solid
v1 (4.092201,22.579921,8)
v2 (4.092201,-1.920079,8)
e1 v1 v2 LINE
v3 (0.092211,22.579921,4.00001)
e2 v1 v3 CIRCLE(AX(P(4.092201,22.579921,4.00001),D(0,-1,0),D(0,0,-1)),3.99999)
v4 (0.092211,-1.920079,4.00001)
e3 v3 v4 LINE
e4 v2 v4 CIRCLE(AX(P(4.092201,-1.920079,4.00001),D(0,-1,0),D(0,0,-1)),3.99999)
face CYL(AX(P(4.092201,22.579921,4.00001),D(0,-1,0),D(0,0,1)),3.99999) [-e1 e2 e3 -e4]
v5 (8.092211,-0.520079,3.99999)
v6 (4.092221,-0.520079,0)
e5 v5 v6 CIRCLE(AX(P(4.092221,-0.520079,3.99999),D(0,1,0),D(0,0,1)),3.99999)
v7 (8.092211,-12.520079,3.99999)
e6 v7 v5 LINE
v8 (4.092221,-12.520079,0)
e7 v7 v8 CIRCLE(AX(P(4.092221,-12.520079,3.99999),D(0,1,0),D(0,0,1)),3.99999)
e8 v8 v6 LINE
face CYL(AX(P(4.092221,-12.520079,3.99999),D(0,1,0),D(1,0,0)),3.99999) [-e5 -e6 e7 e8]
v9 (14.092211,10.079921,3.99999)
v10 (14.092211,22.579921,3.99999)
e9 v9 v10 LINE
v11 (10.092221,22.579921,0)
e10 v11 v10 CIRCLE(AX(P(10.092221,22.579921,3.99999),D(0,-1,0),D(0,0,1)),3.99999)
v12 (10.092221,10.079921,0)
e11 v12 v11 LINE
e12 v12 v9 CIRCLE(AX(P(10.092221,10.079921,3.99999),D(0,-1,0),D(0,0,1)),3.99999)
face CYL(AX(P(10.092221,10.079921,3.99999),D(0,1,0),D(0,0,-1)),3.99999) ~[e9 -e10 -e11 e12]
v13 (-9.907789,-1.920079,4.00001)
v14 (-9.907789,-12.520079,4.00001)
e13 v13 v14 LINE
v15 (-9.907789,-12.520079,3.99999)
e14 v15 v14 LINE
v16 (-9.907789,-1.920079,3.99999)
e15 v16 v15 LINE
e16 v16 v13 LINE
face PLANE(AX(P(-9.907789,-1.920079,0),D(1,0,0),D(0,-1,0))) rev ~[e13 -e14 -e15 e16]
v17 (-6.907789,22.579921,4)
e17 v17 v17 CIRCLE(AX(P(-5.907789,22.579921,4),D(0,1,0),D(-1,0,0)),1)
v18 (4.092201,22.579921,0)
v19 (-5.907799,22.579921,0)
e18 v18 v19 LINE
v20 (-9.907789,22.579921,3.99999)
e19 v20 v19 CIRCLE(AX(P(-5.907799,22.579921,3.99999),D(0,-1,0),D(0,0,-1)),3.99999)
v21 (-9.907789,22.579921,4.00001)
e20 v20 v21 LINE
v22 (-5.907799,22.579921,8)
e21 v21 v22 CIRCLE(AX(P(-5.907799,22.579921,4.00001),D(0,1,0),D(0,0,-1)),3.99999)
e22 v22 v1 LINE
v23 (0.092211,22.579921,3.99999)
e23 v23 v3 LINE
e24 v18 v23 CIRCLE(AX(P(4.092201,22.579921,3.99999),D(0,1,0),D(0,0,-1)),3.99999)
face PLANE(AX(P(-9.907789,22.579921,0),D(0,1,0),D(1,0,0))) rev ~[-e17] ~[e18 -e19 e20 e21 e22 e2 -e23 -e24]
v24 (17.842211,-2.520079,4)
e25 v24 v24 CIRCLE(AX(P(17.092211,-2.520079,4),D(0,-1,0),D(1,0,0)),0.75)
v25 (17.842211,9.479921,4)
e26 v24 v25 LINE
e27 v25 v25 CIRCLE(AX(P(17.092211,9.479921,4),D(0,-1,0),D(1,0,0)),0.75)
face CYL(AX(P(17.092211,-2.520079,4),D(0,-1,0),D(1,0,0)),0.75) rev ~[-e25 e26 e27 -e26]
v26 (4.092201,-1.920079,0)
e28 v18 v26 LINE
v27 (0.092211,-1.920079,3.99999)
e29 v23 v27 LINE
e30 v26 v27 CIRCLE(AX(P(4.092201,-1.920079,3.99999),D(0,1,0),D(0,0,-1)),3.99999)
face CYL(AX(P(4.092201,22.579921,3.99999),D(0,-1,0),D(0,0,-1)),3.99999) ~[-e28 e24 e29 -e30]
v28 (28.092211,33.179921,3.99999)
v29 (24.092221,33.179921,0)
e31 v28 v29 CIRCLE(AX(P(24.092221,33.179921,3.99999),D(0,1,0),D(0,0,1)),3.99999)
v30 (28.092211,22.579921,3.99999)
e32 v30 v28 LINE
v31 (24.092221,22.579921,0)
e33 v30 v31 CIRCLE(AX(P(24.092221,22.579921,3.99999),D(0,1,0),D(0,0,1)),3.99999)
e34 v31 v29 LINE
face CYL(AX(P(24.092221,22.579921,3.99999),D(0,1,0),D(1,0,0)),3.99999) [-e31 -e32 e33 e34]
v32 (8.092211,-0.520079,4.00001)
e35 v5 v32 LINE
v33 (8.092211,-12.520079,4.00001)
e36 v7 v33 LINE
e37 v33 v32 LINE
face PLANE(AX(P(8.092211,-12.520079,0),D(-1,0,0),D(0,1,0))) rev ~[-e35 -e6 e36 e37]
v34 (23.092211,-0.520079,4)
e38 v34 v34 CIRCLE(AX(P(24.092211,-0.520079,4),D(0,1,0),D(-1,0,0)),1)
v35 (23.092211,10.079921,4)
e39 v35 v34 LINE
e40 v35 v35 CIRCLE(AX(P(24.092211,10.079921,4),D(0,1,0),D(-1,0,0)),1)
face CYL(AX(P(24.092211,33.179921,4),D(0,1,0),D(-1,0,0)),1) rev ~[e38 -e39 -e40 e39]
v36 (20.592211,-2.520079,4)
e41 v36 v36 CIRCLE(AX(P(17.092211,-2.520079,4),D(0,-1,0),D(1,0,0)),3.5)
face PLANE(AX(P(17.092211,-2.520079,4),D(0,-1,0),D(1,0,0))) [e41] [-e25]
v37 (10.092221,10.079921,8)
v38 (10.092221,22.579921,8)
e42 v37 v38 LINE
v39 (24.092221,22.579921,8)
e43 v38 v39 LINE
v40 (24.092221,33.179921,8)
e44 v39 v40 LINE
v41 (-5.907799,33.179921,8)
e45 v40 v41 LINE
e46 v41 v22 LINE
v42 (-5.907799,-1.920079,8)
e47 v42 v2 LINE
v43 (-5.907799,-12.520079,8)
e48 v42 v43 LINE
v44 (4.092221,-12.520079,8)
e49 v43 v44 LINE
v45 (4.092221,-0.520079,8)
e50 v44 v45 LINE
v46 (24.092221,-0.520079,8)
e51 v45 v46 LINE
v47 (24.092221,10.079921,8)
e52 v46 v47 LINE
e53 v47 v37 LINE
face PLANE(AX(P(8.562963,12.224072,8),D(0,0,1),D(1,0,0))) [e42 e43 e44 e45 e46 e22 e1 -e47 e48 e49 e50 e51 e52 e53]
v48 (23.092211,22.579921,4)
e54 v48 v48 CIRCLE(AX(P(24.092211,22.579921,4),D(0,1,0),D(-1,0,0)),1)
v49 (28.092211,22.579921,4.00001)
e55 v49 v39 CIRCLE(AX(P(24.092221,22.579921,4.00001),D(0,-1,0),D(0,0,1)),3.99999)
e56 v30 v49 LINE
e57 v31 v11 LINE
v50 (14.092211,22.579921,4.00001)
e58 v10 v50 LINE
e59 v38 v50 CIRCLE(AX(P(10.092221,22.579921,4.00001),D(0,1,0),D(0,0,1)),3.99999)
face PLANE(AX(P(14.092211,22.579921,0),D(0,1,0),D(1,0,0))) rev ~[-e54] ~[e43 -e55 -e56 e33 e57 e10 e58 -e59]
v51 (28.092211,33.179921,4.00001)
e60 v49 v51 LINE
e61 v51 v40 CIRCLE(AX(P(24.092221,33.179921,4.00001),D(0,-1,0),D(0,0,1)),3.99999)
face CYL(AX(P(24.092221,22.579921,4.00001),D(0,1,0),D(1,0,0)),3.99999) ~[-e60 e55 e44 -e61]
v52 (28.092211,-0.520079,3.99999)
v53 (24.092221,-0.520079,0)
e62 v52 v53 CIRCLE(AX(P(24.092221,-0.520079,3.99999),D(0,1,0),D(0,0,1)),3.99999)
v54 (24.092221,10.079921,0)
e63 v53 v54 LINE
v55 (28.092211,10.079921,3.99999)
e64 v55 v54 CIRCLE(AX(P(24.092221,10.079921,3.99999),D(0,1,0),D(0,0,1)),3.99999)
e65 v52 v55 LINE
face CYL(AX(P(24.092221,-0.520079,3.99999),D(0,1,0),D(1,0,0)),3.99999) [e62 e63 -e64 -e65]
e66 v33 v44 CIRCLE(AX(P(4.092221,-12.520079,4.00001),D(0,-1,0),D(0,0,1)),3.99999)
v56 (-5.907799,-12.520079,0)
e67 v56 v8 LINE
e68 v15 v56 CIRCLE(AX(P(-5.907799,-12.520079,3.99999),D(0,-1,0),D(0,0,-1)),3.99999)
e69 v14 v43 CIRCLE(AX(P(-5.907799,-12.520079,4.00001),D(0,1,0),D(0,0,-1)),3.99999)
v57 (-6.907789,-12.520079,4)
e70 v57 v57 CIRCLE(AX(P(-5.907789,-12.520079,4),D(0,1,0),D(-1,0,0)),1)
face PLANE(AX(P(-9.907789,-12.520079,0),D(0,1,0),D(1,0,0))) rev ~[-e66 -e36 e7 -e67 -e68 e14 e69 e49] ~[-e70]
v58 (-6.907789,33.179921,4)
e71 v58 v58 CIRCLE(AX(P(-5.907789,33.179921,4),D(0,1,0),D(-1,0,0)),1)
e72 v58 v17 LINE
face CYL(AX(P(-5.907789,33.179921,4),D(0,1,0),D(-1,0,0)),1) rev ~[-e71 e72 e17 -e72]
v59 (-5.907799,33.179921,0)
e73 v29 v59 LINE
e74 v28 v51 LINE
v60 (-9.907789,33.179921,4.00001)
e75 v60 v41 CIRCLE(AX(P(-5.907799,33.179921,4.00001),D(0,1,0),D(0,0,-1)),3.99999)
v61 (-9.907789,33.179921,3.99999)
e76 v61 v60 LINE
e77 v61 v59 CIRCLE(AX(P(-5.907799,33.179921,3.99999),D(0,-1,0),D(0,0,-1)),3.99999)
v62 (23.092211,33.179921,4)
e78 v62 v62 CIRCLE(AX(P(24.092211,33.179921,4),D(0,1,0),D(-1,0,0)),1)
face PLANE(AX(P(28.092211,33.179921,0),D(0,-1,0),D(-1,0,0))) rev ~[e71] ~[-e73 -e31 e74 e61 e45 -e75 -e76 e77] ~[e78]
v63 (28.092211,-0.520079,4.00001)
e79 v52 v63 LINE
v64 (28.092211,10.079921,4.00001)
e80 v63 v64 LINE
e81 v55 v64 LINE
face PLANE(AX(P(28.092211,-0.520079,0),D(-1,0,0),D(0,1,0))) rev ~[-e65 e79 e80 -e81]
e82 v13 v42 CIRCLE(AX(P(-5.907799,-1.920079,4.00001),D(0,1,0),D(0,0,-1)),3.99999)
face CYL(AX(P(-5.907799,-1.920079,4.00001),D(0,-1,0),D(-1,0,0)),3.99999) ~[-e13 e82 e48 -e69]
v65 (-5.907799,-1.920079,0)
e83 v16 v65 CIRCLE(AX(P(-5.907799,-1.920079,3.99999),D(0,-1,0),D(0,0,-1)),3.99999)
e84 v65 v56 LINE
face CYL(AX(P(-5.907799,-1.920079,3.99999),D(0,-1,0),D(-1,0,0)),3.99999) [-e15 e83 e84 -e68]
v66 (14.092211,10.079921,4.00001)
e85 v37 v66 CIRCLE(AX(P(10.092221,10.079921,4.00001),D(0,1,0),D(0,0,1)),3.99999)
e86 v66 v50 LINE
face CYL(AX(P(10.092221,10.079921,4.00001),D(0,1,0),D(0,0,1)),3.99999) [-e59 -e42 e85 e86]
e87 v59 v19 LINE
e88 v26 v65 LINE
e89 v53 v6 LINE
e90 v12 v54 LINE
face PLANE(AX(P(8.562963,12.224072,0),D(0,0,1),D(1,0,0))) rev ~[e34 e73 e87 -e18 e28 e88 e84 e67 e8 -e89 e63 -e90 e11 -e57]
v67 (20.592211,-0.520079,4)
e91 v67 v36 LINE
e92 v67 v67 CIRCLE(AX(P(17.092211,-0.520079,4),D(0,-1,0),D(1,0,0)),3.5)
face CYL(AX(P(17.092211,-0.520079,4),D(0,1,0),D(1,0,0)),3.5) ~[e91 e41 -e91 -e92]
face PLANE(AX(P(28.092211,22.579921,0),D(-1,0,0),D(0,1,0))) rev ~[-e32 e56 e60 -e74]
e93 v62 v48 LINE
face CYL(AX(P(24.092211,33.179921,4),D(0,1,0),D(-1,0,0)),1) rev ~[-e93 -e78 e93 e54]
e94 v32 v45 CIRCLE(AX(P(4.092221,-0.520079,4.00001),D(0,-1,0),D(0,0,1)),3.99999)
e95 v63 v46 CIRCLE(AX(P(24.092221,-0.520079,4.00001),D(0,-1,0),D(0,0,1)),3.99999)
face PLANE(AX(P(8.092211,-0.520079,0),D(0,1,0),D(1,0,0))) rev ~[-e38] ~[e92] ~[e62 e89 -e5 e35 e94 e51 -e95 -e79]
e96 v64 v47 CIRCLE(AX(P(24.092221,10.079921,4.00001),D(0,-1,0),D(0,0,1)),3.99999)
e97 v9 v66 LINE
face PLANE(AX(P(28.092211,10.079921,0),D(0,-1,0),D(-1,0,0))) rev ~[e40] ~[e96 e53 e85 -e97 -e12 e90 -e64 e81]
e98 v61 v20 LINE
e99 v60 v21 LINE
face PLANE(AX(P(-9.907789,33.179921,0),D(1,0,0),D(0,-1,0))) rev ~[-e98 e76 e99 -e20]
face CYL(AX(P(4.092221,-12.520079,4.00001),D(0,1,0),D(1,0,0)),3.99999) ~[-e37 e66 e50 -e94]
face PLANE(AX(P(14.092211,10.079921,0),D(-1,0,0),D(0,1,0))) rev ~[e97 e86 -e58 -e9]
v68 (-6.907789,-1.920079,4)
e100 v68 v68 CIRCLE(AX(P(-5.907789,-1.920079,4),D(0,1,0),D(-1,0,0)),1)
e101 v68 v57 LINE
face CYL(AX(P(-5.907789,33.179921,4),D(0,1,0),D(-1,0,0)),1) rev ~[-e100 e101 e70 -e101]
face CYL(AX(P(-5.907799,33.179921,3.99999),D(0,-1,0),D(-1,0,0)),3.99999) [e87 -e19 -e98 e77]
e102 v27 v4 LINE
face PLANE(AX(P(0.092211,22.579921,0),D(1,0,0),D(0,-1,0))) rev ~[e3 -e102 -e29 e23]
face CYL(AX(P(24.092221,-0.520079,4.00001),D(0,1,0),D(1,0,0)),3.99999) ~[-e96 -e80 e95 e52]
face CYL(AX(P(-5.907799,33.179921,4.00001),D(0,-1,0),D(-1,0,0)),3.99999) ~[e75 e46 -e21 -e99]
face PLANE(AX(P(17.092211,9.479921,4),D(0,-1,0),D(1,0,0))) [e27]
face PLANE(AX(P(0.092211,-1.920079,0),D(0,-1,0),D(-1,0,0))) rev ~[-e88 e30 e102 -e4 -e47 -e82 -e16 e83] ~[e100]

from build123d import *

# Parameters (mm, degrees)
F1_DEPTH = 8
F2_R     = 3.99999
F3_R     = 1
F4_DEPTH = 60
F6_R     = 3.99999
F5_R     = 3.5
F7_DEPTH = 2
F8_R     = 0.75
F9_DEPTH = 12


# Not quite as in the source:
# - a fillet or chamfer is up to 0.001 mm smaller than in the source, because OpenCascade refuses the exact size


with BuildPart() as f1:
    # F0 (on Top) → F1 (new body)
    with BuildSketch(Plane.XY):
        Polygon((-9.9077894302, -1.920078908), (-9.9077894302, -12.520078908), (8.0922105698, -12.520078908), (8.0922105698, -0.520078908), (28.0922105698, -0.520078908), (28.0922105698, 10.079921092), (14.0922105698, 10.079921092), (14.0922105698, 22.579921092), (28.0922105698, 22.579921092), (28.0922105698, 33.179921092), (-9.9077894302, 33.179921092), (-9.9077894302, 22.579921092), (0.0922105698, 22.579921092), (0.0922105698, -1.920078908), align=None)
    extrude(amount=F1_DEPTH)

    # F2 (radius 4 in the source; OpenCascade refuses exactly that, so slightly less here)
    f2_edges = [f1.edges().sort_by_distance(p)[0] for p in [
        (-9.907789, -7.220079, 8),
        (-9.907789, -7.220079, 0),
        (8.092211, -6.520079, 8),
        (8.092211, -6.520079, 0),
        (28.092211, 4.779921, 8),
        (28.092211, 4.779921, 0),
        (28.092211, 27.879921, 8),
        (28.092211, 27.879921, 0),
        (-9.907789, 27.879921, 8),
        (-9.907789, 27.879921, 0),
    ]]
    fillet(f2_edges, radius=F2_R)

    # F3 (on face) → F4 (cut)
    with BuildSketch(Plane(origin=(0, 33.179921092, 0), x_dir=(-1, 0, 0), z_dir=(0, 1, 0))):
        with Locations((-24.0922105698, 4)):
            Circle(F3_R)
        with Locations((5.9077894302, 4)):
            Circle(F3_R)
    extrude(amount=-F4_DEPTH, mode=Mode.SUBTRACT)

    # F6 (radius 4 in the source; OpenCascade refuses exactly that, so slightly less here)
    f6_edges = [f1.edges().sort_by_distance(p)[0] for p in [
        (0.092211, 10.329921, 8),
        (0.092211, 10.329921, 0),
        (14.092211, 16.329921, 8),
        (14.092211, 16.329921, 0),
    ]]
    fillet(f6_edges, radius=F6_R)

    # F5 (on face) → F7 (join)
    with BuildSketch(Plane.XZ.offset(0.520078908)):
        with Locations((17.0922105698, 4)):
            Circle(F5_R)
    extrude(amount=F7_DEPTH)

    # F8 (on face) → F9 (cut)
    with BuildSketch(Plane.XZ.offset(2.520078908)):
        with Locations((17.0922105698, 4)):
            Circle(F8_R)
    extrude(amount=-F9_DEPTH, mode=Mode.SUBTRACT)


solid = f1.part
